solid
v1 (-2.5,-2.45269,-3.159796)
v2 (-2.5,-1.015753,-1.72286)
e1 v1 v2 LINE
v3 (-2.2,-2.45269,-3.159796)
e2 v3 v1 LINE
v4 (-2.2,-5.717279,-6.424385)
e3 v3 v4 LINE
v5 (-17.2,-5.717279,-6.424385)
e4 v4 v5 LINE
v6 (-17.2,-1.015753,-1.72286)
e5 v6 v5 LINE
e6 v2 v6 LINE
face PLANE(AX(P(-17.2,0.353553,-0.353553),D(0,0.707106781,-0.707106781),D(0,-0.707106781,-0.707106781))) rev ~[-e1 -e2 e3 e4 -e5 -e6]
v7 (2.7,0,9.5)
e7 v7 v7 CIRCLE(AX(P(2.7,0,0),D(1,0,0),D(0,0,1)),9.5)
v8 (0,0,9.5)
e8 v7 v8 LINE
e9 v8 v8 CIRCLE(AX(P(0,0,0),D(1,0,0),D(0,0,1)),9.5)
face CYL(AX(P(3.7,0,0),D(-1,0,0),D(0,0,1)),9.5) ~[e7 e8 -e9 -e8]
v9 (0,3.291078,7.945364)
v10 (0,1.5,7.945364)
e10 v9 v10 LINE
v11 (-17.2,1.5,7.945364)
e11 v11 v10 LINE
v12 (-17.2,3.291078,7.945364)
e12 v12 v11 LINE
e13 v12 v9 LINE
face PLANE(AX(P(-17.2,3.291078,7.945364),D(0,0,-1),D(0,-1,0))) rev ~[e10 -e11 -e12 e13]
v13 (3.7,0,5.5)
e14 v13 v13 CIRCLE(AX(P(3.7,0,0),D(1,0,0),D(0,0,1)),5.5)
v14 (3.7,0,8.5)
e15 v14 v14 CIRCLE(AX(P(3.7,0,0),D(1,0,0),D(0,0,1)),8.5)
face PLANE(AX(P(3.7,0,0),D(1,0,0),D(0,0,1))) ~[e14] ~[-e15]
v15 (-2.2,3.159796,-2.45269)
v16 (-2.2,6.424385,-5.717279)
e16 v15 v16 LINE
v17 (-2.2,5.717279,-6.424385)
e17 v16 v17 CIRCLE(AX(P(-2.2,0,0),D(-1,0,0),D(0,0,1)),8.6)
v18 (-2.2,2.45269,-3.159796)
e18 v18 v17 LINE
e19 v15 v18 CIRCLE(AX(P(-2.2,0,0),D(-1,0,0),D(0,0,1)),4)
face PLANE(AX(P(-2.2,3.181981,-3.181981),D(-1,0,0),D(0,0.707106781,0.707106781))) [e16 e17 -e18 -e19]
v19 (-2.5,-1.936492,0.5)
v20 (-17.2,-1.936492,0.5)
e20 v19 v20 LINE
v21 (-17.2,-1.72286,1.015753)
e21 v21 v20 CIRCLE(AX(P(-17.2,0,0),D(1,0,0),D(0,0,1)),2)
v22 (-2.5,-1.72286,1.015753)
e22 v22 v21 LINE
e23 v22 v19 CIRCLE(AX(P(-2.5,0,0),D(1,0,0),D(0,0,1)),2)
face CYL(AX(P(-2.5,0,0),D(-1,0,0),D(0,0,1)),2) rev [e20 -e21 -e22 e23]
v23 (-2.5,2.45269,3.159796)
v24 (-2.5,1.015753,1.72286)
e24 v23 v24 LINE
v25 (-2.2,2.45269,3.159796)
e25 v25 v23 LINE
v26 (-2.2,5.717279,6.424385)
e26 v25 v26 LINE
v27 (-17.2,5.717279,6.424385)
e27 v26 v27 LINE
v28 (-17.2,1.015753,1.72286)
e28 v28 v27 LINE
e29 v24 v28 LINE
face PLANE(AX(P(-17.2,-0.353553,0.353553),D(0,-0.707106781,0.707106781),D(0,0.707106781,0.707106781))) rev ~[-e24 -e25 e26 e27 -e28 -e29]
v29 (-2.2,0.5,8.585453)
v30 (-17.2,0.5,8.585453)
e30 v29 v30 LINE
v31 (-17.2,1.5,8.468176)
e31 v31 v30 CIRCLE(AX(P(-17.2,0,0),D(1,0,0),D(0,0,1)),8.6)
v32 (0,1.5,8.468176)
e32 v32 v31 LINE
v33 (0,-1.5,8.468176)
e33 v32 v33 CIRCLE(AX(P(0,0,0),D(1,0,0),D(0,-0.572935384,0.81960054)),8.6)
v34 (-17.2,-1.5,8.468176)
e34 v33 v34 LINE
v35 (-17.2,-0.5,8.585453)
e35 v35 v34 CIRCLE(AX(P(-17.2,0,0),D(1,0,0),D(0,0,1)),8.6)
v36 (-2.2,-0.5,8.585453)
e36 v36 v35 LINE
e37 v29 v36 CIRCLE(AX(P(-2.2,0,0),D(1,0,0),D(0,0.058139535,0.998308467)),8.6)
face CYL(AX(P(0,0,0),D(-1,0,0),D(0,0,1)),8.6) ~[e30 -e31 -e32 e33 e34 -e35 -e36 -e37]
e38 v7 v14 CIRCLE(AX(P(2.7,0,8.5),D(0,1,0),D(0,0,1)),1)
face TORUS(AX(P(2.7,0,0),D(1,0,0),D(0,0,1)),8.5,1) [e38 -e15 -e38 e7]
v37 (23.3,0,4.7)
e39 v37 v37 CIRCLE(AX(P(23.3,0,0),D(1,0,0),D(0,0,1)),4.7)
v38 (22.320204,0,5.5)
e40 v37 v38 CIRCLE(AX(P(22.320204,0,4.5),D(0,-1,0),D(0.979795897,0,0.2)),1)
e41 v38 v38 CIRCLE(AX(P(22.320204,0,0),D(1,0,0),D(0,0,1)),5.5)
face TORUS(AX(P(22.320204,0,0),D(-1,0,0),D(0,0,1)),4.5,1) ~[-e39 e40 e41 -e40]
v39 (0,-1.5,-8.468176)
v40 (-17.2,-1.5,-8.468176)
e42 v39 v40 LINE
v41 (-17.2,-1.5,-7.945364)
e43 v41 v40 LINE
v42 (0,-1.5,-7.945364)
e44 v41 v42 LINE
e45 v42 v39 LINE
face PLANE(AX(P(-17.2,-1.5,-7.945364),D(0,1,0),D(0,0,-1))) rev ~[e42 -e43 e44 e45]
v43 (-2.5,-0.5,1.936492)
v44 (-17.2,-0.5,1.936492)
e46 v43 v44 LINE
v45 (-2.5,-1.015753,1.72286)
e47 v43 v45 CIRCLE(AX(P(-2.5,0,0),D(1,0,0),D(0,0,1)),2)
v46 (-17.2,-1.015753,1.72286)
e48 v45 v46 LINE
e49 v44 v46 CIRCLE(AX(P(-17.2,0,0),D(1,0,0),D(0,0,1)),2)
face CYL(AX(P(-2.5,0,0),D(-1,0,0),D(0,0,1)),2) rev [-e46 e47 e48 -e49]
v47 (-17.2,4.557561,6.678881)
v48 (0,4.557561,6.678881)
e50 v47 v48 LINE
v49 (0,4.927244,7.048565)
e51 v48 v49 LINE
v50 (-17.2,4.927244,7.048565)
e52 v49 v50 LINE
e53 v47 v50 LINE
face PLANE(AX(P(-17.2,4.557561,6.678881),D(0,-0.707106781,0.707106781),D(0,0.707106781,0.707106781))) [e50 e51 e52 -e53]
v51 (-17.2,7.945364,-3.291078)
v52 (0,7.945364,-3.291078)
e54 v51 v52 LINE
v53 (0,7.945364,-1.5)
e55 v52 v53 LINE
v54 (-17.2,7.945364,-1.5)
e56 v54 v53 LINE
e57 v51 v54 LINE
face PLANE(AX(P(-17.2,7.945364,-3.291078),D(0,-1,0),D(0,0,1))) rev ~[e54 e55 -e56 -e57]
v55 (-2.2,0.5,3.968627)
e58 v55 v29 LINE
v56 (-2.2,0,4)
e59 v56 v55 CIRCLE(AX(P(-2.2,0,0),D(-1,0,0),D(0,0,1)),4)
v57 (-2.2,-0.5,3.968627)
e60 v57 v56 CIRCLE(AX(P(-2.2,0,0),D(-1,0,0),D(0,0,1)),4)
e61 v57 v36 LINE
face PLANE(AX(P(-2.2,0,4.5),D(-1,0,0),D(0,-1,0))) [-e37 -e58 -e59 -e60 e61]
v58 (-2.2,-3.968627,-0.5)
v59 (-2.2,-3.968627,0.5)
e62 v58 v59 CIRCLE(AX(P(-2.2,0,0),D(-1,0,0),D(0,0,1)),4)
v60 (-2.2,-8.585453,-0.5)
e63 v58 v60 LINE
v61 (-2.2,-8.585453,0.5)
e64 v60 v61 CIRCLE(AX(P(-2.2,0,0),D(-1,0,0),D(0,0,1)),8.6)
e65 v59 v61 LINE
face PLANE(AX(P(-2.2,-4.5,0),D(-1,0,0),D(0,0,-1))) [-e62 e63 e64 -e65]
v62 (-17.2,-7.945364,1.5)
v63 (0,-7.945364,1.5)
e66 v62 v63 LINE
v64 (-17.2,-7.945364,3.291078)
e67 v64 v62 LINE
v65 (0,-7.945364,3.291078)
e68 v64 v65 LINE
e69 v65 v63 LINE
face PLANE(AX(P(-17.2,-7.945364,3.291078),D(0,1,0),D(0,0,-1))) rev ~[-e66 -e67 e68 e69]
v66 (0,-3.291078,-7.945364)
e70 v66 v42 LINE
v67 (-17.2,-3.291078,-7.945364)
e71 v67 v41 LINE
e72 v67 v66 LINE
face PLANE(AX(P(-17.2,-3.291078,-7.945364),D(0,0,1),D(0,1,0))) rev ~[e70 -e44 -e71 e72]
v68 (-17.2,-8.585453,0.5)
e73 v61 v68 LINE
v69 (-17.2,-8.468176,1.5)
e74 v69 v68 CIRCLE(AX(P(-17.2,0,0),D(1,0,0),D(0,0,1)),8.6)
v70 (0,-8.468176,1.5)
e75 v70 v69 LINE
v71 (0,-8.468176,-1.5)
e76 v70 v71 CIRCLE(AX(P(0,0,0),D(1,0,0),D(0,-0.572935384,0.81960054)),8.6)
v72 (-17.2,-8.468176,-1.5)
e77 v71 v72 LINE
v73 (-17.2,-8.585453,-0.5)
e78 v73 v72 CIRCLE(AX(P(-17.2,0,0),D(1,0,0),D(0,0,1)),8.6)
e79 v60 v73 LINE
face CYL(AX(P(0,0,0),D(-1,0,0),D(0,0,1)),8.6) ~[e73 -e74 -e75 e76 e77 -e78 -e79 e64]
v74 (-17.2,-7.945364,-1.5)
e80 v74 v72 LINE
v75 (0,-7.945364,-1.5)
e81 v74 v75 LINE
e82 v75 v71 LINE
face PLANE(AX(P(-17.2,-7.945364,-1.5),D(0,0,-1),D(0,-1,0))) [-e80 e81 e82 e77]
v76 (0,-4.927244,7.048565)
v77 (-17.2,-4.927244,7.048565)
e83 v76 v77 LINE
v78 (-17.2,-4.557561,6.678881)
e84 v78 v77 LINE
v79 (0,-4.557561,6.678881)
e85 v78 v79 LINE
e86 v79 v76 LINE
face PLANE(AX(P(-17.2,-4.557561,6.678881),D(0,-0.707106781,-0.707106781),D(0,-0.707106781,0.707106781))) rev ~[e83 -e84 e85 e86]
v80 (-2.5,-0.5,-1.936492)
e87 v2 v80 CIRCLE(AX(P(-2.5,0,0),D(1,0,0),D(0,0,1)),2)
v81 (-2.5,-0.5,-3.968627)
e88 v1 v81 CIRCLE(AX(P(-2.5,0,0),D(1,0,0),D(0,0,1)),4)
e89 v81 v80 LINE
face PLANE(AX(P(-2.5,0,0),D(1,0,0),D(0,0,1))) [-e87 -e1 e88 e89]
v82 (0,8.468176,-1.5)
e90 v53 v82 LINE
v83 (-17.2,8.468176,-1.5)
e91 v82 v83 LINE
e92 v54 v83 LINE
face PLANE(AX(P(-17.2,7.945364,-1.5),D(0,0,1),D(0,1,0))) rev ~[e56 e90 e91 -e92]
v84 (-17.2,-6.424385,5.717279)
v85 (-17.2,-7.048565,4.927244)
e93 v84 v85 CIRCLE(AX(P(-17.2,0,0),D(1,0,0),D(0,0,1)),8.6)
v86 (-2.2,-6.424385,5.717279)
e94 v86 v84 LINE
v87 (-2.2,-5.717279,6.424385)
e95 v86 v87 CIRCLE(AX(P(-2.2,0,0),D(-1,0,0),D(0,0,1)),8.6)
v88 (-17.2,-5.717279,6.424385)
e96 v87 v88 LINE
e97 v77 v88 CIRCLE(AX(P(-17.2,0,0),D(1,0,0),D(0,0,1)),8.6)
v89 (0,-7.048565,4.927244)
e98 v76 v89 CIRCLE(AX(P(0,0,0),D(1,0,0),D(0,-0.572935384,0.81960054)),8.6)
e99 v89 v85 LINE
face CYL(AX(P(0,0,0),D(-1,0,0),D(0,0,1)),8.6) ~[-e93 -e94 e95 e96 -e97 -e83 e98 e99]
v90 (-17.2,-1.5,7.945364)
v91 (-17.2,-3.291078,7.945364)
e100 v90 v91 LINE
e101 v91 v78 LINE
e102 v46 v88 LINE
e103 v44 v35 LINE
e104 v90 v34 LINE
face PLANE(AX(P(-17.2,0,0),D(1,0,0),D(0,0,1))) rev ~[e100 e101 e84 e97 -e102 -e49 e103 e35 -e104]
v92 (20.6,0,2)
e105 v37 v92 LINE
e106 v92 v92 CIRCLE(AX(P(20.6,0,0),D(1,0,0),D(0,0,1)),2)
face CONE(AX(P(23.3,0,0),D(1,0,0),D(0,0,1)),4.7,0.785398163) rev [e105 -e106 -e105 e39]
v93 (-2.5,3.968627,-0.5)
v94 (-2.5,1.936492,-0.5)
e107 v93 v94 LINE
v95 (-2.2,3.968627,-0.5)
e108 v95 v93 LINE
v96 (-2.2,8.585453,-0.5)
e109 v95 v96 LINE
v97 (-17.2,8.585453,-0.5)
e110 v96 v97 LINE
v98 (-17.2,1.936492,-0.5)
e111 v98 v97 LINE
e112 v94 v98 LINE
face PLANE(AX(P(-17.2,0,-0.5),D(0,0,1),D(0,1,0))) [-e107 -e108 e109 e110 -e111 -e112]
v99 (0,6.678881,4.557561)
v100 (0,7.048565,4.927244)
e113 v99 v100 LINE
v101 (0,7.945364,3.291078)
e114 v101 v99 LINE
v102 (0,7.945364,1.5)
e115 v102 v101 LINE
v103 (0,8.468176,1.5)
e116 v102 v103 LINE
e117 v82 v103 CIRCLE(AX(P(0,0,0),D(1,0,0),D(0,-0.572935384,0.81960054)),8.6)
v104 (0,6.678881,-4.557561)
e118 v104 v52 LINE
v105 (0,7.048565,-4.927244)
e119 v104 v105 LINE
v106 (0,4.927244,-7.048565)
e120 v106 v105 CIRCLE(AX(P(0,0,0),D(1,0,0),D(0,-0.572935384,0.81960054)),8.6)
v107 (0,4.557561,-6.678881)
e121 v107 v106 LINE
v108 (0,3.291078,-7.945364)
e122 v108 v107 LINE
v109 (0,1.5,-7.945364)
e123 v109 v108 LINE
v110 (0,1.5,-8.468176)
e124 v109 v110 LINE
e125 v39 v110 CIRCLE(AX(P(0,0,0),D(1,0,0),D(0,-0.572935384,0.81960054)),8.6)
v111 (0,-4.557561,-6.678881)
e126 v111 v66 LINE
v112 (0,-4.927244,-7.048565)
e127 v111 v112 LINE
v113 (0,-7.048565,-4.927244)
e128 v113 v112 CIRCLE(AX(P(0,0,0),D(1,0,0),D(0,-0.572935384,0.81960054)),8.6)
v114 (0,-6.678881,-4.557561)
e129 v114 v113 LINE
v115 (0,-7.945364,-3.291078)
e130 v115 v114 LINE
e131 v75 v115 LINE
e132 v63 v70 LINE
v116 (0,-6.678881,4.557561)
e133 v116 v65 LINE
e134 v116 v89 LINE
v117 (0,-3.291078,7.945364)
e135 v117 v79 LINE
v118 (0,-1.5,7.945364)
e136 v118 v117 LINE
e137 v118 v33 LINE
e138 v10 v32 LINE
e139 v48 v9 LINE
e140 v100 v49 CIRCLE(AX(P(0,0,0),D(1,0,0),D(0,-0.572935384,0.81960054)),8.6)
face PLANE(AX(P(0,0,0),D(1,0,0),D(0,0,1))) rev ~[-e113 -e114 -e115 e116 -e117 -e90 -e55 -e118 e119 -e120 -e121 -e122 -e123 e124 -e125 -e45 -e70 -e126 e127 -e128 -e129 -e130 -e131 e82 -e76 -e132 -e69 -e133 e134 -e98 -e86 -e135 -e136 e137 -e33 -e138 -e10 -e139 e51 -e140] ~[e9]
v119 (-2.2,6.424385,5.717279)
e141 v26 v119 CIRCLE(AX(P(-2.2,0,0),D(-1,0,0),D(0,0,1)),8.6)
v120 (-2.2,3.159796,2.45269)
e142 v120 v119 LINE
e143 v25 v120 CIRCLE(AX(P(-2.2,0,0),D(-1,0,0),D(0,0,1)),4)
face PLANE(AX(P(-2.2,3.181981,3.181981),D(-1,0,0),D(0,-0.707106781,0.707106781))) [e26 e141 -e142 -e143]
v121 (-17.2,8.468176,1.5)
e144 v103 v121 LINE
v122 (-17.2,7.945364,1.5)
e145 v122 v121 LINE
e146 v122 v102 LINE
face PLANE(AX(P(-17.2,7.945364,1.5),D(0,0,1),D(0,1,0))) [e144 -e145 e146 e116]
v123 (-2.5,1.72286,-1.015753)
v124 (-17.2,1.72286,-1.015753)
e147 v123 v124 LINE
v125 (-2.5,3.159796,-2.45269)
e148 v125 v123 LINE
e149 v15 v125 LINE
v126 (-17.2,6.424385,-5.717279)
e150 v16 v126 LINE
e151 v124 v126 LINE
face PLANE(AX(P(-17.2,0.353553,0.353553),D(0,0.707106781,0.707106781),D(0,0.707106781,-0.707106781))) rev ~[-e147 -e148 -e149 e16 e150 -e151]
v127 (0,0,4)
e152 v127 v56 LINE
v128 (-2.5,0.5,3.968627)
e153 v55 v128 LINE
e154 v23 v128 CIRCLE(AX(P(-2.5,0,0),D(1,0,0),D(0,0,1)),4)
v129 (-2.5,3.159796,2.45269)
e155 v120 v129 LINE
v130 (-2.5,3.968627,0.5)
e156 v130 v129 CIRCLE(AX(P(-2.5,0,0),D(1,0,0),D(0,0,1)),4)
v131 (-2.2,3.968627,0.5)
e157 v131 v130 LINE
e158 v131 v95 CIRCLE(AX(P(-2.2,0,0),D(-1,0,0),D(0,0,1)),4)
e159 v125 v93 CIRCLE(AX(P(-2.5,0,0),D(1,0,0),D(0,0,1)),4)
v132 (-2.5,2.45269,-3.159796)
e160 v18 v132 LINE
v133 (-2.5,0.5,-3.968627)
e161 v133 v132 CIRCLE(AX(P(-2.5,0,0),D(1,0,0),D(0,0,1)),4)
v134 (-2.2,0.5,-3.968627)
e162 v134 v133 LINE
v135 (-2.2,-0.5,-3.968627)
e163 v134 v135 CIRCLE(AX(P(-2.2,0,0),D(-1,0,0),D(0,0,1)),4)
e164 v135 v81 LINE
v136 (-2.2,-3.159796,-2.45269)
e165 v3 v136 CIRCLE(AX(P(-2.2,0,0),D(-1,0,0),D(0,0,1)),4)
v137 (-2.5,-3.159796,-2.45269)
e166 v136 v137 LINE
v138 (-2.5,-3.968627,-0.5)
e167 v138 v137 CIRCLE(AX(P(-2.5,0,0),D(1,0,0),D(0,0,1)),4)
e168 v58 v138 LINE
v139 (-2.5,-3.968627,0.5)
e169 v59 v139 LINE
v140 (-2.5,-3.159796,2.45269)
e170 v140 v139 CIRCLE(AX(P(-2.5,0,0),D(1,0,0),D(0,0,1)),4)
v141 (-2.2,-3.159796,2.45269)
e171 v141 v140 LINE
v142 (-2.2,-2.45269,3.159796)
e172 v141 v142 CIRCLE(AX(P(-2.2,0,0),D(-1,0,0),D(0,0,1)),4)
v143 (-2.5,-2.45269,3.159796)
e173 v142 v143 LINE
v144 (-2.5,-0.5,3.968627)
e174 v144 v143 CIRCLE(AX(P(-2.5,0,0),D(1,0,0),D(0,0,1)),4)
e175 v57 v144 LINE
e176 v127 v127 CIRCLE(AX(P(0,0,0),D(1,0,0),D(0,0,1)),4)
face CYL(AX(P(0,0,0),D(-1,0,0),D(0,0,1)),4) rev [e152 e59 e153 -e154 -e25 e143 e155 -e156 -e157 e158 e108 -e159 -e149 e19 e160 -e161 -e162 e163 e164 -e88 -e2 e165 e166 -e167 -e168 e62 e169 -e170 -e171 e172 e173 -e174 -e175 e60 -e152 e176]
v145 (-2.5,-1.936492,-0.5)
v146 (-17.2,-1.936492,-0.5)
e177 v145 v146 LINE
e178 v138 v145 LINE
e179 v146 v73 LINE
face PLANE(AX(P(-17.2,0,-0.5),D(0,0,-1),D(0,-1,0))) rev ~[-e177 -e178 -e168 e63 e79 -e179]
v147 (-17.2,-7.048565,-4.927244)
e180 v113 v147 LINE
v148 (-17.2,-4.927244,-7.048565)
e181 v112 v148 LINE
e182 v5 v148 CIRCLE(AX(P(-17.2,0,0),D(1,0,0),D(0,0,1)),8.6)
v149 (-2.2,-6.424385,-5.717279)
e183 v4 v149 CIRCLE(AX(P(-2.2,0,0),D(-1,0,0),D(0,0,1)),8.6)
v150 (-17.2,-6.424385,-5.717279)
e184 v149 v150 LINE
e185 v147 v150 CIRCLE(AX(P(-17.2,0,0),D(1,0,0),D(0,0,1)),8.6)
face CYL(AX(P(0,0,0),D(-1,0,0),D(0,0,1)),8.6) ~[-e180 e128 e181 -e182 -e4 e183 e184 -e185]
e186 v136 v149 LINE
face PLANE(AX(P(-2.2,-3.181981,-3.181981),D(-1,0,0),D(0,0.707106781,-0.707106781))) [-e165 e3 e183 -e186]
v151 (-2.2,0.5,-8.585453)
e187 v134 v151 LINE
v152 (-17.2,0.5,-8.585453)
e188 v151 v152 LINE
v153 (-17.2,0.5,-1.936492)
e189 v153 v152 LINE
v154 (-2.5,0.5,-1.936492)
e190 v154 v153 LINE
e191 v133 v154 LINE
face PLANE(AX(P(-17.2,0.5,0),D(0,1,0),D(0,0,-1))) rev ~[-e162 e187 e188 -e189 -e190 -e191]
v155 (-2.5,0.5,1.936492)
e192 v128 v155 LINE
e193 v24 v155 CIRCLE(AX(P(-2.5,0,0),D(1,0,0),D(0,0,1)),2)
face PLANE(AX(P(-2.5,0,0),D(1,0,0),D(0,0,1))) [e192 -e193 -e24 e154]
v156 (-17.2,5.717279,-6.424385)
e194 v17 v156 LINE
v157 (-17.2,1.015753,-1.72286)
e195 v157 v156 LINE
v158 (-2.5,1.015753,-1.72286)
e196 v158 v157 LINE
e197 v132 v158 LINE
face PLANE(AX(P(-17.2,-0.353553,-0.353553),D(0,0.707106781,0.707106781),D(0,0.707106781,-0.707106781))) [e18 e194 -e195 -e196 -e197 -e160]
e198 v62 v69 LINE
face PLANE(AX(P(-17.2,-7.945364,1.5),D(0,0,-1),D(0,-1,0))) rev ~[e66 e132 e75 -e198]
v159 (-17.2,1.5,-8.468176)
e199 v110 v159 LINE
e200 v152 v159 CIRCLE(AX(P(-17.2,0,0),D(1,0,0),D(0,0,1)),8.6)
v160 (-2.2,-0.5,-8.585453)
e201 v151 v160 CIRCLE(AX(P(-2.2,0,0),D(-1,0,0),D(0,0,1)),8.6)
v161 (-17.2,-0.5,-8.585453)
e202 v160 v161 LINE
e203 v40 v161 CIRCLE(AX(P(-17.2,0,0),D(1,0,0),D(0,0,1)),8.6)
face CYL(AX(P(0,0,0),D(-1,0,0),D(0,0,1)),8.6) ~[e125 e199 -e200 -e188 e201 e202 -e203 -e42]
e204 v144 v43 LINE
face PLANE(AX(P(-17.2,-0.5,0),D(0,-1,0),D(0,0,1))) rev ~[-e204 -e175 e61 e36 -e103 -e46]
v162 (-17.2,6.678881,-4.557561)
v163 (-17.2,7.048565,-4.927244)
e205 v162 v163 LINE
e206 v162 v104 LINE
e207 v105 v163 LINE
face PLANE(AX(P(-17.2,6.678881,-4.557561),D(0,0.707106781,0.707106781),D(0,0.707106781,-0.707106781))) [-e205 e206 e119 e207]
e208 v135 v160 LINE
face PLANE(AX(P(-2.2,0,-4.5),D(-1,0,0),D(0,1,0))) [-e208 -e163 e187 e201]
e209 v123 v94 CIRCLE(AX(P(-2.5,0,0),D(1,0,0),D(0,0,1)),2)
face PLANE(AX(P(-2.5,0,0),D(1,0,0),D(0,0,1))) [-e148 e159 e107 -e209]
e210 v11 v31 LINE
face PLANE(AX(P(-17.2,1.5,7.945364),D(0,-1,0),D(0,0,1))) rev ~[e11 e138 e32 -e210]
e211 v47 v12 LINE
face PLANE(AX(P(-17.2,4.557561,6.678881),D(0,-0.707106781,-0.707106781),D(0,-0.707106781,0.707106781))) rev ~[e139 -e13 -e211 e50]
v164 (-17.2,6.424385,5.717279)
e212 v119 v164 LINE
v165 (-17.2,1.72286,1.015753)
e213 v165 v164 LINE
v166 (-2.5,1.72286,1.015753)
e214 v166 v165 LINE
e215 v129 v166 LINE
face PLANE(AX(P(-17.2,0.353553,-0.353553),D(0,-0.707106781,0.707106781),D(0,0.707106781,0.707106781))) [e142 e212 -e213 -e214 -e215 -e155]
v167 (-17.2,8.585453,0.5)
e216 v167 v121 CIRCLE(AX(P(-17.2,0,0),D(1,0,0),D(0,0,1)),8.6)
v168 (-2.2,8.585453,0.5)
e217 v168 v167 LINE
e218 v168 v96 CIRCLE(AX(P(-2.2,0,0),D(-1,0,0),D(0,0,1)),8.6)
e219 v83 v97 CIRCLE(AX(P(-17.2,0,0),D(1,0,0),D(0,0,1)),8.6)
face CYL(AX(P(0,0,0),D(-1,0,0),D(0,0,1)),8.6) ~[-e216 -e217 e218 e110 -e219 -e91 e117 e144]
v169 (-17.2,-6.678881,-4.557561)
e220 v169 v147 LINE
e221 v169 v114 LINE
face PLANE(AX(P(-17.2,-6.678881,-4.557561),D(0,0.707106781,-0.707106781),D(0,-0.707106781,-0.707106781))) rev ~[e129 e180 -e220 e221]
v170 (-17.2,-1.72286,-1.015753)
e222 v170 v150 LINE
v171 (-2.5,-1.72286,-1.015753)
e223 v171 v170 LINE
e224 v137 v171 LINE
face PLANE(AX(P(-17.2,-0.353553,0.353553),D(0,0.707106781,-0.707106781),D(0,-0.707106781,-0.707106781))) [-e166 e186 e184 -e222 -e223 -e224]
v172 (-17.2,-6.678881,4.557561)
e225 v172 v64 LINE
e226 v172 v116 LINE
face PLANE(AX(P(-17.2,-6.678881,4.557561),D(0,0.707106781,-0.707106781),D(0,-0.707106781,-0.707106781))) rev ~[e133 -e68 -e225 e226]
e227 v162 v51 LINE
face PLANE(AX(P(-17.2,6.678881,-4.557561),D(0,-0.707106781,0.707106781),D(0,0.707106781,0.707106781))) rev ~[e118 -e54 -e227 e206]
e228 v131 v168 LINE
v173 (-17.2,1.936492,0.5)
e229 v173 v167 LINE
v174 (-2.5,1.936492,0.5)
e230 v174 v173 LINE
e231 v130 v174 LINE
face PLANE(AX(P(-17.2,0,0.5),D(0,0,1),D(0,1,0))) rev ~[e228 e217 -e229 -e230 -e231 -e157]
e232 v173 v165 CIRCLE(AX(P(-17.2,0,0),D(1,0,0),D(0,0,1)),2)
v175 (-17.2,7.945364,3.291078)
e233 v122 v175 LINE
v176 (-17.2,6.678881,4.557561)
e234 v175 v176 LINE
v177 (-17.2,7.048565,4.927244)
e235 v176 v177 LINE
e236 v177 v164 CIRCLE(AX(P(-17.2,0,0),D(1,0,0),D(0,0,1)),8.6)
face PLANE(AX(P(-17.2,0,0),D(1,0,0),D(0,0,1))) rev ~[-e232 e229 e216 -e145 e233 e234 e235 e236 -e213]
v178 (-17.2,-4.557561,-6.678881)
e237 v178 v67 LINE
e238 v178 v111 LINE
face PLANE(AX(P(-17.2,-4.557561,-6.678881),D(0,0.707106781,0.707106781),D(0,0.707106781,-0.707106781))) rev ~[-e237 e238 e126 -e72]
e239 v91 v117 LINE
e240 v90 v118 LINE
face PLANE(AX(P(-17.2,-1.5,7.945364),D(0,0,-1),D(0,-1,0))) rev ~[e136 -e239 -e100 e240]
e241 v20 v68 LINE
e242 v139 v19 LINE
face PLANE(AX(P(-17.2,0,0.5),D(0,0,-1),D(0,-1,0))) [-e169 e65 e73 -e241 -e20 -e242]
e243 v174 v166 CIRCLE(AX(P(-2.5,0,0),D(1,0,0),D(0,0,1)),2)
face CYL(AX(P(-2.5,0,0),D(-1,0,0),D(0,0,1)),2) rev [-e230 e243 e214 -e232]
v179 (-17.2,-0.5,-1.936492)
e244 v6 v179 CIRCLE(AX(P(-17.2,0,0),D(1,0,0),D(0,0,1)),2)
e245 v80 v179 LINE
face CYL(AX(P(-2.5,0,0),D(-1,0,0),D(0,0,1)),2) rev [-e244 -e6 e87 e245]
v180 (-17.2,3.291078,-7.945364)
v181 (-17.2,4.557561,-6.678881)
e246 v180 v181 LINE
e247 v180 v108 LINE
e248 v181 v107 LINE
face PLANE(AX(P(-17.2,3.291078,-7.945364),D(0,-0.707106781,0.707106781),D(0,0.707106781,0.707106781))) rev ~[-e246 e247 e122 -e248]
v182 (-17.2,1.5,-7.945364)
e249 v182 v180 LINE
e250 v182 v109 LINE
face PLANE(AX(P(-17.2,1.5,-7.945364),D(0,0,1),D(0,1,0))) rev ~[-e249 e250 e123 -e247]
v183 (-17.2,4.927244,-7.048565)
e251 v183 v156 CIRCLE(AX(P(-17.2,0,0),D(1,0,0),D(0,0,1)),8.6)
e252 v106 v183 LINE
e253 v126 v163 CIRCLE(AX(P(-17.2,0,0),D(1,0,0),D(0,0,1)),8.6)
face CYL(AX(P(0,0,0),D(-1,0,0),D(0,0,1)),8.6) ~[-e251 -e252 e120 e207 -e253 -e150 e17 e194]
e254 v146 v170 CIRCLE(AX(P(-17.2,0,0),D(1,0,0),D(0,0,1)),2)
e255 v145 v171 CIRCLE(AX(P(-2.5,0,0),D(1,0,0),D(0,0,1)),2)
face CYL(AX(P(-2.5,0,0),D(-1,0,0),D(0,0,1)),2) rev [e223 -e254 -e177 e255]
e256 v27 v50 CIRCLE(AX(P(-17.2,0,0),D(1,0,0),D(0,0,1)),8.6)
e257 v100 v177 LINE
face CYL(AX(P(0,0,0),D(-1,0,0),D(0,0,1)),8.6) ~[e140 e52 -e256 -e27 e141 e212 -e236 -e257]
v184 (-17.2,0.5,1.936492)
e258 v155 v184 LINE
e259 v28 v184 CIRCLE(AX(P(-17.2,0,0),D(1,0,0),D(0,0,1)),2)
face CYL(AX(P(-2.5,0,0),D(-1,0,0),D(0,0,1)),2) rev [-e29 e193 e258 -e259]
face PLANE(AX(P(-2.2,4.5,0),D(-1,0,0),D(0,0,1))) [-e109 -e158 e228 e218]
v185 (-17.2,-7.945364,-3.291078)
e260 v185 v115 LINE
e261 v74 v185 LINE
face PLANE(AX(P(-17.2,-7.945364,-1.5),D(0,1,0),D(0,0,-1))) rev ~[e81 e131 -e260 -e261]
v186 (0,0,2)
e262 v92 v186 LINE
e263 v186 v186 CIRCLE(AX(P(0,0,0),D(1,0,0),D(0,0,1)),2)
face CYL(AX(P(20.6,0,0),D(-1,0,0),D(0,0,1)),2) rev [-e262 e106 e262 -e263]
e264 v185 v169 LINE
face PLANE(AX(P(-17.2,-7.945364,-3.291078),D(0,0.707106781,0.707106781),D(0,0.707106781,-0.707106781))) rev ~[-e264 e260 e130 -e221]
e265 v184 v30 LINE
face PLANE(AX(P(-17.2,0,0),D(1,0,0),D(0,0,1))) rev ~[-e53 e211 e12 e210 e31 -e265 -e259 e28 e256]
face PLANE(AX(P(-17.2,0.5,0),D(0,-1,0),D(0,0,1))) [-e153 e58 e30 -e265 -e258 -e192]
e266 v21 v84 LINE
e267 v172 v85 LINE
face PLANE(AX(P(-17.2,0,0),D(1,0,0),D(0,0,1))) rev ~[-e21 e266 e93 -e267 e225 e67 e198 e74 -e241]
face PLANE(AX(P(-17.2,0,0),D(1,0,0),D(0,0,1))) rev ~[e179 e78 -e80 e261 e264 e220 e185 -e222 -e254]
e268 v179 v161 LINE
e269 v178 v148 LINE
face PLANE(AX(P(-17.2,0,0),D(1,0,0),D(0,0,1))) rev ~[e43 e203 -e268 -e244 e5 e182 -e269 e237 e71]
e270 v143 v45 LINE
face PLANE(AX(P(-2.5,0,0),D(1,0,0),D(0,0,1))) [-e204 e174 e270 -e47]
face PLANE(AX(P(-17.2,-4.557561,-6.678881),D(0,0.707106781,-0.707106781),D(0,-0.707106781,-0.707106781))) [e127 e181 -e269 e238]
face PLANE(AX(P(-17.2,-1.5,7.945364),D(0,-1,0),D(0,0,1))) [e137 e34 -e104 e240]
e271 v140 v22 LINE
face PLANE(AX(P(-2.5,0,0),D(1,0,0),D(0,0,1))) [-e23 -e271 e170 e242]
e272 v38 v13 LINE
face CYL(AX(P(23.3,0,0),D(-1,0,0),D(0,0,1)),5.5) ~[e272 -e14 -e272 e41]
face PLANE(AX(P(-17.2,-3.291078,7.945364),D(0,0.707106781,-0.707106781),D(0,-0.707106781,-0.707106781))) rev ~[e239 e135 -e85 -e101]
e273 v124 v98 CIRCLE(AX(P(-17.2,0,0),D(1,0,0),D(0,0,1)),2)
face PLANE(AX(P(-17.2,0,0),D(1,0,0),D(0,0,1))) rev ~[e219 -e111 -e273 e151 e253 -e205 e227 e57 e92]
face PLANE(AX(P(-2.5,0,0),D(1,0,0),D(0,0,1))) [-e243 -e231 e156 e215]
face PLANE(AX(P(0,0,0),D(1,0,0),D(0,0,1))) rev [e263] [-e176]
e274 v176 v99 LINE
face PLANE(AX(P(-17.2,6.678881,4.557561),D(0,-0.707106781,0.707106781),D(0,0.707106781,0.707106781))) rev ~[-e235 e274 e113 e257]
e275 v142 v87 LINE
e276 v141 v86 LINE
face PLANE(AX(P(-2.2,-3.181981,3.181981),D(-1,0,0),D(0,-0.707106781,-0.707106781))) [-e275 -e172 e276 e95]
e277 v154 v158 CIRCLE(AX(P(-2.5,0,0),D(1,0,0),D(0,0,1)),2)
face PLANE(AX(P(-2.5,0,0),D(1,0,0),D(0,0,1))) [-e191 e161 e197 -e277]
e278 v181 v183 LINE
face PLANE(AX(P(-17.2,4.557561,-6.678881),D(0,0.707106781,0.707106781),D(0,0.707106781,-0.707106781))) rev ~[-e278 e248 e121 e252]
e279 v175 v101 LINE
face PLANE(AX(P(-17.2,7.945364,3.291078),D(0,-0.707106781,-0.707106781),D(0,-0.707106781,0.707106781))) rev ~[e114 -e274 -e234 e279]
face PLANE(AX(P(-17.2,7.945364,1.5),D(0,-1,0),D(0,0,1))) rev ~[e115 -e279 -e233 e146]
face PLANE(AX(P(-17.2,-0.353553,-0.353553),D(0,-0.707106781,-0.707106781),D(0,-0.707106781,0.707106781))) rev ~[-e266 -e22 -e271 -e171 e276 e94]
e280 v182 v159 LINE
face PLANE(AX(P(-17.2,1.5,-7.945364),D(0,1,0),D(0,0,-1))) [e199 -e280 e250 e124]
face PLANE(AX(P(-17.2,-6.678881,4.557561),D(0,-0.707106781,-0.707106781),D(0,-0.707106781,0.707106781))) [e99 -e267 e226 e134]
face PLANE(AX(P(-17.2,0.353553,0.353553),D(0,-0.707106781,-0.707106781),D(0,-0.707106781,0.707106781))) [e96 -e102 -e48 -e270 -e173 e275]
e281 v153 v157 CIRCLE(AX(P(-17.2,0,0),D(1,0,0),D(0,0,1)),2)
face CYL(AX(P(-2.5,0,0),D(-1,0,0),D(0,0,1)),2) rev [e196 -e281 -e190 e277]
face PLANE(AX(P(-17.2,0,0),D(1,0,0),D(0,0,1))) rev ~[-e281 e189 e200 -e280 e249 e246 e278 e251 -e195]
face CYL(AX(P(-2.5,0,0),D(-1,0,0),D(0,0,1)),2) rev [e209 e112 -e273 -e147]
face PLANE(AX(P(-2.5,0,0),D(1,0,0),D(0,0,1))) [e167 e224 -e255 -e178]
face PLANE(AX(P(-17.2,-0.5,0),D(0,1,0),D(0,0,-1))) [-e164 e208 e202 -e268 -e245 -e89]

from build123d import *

# Parameters (mm, degrees)
F5_W            = 1
F5_H            = 9
F6_DEPTH        = 15
F6_COPIES_COUNT = 8
F7_W            = 1.7910775183
F7_H            = 2
F8_DEPTH        = 17.2
F8_COPIES_COUNT = 8


# Not quite as in the source:
# - a fillet or chamfer that OpenCascade refuses, or shapes differently, is made with other operations: its cross-section is extruded or revolved along the edge and cut away or added
# - a pattern or mirror of a feature is missing from the dataset's text; its kind, count and spacing are read off the source's solid


with BuildPart() as f2:
    # F0 (on Front) → F2 (revolve)
    with BuildSketch(Plane.XZ):
        Polygon((-17.2, 0), (23.3, 0), (23.3, 5.5), (3.7, 5.5), (3.7, 9.5), (0, 9.5), (0, 8.6), (-17.2, 8.6), align=None)
    revolve(axis=Axis((3.6722049117, 0, 0), (1, 0, 0)))

    # F3 (on Front) → F4 (revolve, cut)
    with BuildSketch(Plane.XZ):
        Polygon((-17.2, 0), (23.3, 0), (23.3, 4.7), (20.6, 2), (0, 2), (0, 4), (-2.5, 4), (-2.5, 2), (-17.2, 2), align=None)
    revolve(axis=Axis((3.05, 0, 0), (1, 0, 0)), mode=Mode.SUBTRACT)

    # F5 (on face) → F6 (cut)
    with BuildSketch(Plane(origin=(-17.2, 0, 0), x_dir=(0, -1, 0), z_dir=(-1, 0, 0))):
        with Locations((0, 4.5)):
            Rectangle(F5_W, F5_H)
    f6 = extrude(amount=-F6_DEPTH, mode=Mode.SUBTRACT)

    # F6_copies: F6 ×8 about axis
    f6_copies_axis = Axis((0, 0, 0), (1, 0, 0))
    for i in range(1, F6_COPIES_COUNT):
        add(f6.rotate(f6_copies_axis, i * 360 / F6_COPIES_COUNT), mode=Mode.SUBTRACT)

    # F7 (on face) → F8 (cut, through all)
    with BuildSketch(Plane(origin=(-17.2, 0, 0), x_dir=(0, -1, 0), z_dir=(-1, 0, 0))):
        Polygon((4.7052910807, 9.359577542), (3.2910775183, 7.9453639796), (4.5575605772, 6.6788809207), (5.9717741396, 8.0930944831), align=None)
        with Locations((2.3955387592, 8.9453639796)):
            Rectangle(F7_W, F7_H)
    f8 = extrude(amount=-F8_DEPTH, mode=Mode.SUBTRACT)

    # F8_copies: F8 ×8 about axis
    f8_copies_axis = Axis((0, 0, 0), (1, 0, 0))
    for i in range(1, F8_COPIES_COUNT):
        add(f8.rotate(f8_copies_axis, i * 360 / F8_COPIES_COUNT), mode=Mode.SUBTRACT)

    # F9: fillet of radius 1 on 2 edges, made by hand

    # F9_s1 → F9_t2 (revolve, cut)
    with BuildSketch(Plane.XZ):
        with BuildLine():
            ThreePointArc((23.3, 4.7), (22.9526596349, 5.2745966692), (22.3202041029, 5.5))
            Line((22.3202041029, 5.5), (23.3, 5.5))
            Line((23.3, 5.5), (23.3, 4.7))
        make_face()
    revolve(axis=Axis((23.3, 0, 0), (1, 0, 0)), mode=Mode.SUBTRACT)

    # F9_s3 → F9_t4 (revolve, cut)
    with BuildSketch(Plane.XZ):
        with BuildLine():
            ThreePointArc((2.7, 9.5), (3.4071067812, 9.2071067812), (3.7, 8.5))
            Line((3.7, 8.5), (3.7, 9.5))
            Line((3.7, 9.5), (2.7, 9.5))
        make_face()
    revolve(axis=Axis((3.7, 0, 0), (1, 0, 0)), mode=Mode.SUBTRACT)


solid = f2.part
